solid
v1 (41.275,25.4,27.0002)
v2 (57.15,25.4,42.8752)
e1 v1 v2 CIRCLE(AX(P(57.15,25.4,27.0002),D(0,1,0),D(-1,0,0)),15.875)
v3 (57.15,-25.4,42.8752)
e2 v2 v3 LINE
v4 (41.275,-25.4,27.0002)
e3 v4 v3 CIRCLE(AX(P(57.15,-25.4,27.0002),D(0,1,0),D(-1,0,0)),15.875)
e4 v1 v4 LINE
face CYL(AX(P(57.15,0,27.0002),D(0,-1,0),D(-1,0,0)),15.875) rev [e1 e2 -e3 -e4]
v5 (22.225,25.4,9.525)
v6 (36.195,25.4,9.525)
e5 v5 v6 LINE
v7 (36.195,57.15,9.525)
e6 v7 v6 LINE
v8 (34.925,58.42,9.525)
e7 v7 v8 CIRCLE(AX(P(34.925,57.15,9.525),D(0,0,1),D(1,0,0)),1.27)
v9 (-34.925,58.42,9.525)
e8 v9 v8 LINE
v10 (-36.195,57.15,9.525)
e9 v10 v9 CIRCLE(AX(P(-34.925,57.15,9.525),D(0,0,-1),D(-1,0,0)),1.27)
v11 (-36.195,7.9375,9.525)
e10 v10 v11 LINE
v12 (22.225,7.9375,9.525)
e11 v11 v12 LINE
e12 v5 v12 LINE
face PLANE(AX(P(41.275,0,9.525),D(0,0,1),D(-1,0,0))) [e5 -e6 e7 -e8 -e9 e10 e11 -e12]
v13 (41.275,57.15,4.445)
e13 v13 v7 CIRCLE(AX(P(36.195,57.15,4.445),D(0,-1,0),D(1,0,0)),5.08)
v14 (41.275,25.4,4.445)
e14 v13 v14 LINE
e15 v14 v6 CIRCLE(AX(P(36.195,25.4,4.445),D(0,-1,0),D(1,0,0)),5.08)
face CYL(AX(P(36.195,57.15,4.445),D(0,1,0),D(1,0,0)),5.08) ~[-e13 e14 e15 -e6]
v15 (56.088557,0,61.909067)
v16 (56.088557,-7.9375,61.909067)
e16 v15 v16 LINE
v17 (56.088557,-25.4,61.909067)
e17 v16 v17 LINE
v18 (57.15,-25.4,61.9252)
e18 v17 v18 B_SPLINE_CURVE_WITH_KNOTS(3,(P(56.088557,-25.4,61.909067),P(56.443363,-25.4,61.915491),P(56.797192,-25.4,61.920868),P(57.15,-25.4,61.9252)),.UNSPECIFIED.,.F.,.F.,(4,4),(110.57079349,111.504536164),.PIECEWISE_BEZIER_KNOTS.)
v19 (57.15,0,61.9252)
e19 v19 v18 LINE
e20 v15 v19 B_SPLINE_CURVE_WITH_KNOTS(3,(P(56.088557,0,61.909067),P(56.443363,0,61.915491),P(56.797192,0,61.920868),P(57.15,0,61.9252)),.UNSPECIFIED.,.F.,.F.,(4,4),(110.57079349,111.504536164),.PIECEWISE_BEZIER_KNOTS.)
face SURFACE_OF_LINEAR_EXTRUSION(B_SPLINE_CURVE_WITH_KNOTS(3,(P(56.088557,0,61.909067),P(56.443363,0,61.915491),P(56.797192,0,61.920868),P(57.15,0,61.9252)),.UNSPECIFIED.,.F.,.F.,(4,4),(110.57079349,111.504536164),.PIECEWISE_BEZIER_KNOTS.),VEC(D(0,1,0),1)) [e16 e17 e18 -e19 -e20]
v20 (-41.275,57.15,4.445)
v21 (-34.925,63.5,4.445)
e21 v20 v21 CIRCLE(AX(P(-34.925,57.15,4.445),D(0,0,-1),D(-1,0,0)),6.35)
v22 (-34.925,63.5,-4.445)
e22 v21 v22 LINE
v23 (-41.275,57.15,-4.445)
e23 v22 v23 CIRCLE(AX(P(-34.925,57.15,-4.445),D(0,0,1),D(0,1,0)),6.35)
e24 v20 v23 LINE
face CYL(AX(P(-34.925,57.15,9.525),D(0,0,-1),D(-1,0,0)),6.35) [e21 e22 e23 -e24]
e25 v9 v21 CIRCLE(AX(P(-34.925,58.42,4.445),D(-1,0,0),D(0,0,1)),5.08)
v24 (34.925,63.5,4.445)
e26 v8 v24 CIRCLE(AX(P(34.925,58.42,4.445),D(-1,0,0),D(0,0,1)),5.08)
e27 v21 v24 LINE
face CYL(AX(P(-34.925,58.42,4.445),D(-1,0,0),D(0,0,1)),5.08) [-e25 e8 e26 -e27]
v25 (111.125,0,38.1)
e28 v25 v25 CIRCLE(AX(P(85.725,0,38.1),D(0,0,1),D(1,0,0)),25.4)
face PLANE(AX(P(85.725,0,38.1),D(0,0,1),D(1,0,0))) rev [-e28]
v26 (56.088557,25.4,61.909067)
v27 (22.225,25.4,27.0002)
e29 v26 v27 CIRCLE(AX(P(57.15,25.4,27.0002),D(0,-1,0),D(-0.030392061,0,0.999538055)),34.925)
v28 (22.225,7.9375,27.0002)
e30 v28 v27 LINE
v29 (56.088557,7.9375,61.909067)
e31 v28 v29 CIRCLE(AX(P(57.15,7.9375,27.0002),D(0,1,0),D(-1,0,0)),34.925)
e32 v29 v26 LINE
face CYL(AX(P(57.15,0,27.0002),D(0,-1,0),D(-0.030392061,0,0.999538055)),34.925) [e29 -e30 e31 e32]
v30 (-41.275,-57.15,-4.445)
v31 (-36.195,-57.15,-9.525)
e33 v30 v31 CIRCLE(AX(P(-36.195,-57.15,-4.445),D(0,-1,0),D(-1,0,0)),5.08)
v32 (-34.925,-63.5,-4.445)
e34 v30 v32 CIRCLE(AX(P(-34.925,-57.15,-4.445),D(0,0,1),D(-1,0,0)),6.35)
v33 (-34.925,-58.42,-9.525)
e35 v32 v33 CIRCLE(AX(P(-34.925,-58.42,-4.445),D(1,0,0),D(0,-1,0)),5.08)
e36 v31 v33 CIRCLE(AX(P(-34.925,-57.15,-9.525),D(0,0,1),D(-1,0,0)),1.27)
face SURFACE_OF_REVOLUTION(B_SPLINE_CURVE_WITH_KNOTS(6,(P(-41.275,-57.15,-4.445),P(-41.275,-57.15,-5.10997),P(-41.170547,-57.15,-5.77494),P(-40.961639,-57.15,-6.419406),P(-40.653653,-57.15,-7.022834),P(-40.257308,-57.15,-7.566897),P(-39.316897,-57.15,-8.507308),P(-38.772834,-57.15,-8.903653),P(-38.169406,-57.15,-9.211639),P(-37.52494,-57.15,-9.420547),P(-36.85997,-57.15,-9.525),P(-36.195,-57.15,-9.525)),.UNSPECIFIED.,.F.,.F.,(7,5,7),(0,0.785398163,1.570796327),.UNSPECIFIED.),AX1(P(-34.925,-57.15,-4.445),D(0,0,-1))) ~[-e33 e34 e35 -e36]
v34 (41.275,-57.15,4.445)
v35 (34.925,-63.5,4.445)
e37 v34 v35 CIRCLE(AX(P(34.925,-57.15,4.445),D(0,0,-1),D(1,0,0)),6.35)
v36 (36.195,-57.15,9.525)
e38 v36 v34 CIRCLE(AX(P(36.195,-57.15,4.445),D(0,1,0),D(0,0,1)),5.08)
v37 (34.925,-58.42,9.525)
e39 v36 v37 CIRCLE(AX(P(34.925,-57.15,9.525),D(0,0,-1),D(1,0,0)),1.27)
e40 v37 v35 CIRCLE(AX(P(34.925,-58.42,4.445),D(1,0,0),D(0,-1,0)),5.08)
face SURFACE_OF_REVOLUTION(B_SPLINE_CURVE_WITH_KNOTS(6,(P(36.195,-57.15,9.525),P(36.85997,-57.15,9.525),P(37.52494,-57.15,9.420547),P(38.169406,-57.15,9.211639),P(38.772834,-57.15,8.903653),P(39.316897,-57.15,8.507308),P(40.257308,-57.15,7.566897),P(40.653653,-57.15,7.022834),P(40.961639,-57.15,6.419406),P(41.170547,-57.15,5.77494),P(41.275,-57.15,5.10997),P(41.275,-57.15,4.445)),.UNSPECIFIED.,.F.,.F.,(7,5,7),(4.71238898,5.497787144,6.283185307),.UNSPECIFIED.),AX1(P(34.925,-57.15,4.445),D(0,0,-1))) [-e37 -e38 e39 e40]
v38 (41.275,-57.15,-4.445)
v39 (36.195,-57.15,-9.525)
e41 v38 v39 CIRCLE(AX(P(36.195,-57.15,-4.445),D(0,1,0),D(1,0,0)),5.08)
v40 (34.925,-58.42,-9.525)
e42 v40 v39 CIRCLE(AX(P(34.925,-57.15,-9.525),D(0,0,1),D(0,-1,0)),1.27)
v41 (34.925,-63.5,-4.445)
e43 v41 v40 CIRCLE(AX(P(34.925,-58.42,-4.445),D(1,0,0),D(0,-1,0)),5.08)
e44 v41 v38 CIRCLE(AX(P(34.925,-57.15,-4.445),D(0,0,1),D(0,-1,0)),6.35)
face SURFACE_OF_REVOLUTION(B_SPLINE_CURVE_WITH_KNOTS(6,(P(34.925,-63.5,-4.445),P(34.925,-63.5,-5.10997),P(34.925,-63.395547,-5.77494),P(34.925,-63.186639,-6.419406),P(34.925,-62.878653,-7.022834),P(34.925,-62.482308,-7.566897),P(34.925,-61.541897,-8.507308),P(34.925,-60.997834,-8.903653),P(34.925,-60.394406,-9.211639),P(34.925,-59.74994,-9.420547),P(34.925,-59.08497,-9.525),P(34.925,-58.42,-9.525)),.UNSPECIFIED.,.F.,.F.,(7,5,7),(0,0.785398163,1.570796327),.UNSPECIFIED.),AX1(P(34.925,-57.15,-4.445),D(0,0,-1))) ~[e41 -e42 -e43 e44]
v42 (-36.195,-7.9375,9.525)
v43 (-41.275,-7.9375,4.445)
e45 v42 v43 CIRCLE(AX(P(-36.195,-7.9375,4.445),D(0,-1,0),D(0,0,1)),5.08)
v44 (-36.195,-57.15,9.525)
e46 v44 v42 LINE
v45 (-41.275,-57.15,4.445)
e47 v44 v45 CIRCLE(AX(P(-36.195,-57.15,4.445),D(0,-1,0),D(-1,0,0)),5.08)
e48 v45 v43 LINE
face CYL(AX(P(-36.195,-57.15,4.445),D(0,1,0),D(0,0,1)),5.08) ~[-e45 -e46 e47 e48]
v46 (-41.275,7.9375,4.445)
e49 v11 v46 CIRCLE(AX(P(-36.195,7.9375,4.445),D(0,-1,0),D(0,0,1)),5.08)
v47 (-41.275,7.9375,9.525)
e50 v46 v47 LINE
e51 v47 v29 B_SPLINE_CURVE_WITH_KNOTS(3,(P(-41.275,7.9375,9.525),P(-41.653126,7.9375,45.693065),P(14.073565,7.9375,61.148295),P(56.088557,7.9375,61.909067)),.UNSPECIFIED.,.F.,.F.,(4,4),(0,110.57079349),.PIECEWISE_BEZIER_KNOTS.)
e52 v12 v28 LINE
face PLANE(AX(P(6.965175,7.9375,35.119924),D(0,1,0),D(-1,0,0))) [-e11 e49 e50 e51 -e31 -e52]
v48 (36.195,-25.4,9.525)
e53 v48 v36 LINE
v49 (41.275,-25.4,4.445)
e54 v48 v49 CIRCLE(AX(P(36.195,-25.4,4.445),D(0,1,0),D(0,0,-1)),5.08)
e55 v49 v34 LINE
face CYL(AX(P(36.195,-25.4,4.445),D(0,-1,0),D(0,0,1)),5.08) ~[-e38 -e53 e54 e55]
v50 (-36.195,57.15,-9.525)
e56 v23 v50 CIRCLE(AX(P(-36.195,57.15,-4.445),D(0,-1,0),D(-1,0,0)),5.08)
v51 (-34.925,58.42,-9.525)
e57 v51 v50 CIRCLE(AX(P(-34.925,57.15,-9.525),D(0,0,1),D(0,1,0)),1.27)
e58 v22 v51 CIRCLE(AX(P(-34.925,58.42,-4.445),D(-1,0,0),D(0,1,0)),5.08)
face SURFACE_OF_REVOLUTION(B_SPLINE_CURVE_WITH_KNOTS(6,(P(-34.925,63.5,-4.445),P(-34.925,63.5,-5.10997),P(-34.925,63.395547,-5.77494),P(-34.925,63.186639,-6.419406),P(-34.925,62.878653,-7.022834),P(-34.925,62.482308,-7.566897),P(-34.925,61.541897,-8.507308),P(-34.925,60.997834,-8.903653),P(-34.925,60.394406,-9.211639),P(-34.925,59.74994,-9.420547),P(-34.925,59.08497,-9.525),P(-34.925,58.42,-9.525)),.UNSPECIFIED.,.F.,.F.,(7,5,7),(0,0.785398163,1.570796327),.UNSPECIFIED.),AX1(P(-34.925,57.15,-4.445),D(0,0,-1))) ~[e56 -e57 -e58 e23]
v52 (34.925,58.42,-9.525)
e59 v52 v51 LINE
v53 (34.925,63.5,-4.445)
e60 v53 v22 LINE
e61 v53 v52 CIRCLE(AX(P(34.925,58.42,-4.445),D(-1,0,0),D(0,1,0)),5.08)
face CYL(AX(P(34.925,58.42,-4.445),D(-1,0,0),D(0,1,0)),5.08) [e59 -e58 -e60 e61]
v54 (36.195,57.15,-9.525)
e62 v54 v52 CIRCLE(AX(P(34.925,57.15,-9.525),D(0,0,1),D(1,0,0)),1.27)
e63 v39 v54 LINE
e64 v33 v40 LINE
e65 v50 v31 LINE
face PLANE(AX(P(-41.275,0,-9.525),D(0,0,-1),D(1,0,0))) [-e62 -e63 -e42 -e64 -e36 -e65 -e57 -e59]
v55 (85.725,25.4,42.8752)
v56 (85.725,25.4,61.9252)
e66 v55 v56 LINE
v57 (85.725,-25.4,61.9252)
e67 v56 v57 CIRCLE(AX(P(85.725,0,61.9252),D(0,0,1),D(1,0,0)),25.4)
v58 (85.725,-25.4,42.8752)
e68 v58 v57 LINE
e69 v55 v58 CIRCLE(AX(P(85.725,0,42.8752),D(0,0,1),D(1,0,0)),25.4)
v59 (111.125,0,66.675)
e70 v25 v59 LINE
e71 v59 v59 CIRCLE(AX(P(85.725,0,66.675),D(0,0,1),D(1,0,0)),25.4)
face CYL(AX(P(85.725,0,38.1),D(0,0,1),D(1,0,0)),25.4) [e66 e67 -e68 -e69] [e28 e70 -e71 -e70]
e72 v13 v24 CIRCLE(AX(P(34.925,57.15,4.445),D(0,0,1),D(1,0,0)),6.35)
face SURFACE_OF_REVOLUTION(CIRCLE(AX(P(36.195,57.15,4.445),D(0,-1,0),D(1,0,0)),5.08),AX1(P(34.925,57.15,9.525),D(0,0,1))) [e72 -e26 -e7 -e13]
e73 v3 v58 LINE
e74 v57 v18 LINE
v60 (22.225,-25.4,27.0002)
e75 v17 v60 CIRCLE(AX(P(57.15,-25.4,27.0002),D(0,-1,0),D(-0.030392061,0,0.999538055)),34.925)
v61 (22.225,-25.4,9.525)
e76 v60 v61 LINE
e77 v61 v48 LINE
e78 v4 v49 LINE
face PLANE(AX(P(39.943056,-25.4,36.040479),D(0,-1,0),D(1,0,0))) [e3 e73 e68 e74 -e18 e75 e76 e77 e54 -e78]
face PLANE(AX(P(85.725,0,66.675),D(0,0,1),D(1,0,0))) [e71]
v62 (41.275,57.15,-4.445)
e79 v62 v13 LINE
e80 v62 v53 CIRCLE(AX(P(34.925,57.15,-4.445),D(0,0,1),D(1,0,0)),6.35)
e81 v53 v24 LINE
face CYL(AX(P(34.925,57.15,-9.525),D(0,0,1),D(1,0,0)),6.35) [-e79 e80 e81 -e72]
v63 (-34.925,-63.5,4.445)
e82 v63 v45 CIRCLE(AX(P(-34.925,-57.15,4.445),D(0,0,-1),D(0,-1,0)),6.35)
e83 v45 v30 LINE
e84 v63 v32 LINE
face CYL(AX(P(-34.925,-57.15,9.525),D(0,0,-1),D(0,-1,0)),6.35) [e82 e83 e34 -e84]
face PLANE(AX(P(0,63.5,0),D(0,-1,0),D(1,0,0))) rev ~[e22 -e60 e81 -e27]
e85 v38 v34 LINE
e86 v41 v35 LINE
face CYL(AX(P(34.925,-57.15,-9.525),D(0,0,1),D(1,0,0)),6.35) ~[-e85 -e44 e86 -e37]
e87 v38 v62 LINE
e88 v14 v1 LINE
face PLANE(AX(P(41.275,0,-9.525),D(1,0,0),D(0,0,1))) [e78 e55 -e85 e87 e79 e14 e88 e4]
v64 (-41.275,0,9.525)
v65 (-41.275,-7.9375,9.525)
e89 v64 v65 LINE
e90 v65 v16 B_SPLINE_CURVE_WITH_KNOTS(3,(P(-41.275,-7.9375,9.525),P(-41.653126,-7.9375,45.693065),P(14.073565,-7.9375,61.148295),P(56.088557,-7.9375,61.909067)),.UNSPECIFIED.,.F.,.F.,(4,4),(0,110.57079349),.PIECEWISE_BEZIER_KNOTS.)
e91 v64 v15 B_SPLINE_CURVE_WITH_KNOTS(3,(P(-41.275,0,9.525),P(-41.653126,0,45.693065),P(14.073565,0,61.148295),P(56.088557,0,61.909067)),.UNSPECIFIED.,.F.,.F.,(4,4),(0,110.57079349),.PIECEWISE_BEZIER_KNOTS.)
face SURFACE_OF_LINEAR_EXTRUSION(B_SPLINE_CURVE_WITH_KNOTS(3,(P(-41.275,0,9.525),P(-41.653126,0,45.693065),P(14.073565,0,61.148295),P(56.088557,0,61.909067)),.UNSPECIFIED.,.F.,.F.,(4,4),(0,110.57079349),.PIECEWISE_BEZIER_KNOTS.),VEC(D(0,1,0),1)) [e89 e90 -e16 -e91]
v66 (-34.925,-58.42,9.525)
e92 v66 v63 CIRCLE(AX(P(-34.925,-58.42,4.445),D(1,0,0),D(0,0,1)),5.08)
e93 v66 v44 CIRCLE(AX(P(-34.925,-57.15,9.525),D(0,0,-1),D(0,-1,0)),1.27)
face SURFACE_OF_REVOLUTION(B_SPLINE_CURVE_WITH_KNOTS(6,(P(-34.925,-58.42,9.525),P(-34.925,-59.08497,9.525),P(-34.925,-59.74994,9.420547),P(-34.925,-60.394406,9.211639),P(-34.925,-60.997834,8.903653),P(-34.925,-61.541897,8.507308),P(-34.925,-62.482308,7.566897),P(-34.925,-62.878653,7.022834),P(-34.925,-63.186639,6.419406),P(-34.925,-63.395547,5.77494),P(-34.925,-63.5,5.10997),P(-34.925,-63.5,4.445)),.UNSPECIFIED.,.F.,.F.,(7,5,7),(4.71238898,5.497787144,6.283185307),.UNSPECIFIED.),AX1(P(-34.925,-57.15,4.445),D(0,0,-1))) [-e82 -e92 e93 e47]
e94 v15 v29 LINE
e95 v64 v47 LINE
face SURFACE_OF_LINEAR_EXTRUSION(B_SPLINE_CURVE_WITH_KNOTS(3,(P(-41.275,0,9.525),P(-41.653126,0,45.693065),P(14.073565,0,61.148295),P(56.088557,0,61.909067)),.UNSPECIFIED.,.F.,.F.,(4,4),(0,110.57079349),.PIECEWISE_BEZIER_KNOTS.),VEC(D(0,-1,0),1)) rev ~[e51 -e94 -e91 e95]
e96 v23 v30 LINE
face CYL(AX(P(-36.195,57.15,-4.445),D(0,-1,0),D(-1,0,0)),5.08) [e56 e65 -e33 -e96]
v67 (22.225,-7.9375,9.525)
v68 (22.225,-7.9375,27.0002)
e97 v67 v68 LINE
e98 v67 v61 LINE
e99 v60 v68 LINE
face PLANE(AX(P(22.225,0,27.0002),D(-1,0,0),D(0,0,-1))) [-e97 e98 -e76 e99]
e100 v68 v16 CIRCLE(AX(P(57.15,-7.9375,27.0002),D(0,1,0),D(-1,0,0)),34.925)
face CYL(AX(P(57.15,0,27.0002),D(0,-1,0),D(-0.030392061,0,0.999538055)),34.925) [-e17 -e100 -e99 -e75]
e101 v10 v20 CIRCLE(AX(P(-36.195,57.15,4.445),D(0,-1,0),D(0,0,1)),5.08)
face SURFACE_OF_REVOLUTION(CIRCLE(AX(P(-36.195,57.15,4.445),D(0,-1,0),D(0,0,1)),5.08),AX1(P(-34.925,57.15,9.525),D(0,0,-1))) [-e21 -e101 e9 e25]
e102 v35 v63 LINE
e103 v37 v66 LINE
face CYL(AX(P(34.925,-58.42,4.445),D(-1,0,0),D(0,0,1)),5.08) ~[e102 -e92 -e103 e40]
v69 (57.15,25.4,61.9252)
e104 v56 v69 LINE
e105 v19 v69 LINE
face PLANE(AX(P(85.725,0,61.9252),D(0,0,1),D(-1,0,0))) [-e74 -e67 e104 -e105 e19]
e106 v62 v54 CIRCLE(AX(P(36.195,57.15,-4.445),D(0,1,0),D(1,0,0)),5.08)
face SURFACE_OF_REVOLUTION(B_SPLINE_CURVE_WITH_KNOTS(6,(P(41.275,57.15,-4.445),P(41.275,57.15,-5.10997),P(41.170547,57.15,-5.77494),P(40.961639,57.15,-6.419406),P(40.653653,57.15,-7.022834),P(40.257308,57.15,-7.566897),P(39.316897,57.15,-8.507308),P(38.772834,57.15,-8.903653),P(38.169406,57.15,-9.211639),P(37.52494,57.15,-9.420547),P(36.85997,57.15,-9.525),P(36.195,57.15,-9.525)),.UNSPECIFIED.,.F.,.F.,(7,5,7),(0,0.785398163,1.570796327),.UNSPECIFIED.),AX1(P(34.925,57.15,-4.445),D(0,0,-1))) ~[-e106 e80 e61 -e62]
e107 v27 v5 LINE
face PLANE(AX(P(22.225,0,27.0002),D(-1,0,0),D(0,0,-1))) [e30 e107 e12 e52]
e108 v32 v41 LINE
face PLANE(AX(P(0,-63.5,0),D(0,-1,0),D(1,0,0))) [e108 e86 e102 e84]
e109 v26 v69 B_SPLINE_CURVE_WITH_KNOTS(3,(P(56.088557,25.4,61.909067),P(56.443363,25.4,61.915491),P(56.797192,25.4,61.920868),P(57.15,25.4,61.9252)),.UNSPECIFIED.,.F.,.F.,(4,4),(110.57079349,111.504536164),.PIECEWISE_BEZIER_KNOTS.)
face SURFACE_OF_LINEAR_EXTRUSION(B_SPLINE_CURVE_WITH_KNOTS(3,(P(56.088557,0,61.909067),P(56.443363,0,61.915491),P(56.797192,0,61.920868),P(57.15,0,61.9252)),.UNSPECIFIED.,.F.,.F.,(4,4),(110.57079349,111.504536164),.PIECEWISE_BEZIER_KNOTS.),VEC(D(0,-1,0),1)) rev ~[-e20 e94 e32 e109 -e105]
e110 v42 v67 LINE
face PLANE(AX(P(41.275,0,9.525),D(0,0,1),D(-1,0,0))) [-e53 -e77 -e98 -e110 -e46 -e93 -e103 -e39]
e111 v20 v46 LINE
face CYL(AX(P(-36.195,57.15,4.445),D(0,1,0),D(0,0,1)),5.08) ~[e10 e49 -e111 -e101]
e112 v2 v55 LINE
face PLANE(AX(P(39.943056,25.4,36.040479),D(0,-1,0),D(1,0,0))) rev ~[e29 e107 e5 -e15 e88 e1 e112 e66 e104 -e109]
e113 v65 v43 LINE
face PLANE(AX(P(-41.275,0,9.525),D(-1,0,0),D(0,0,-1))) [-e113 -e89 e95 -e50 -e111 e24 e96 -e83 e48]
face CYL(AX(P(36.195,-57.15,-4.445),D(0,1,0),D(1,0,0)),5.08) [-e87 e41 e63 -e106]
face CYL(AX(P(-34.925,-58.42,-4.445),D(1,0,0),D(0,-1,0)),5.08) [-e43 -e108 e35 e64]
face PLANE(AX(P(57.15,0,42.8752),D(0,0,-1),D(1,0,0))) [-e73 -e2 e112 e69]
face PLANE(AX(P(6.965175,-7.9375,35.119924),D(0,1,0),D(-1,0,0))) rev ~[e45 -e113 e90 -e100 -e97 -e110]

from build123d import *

# Parameters (mm, degrees)
F1_DEPTH     = 63.5
F0_W         = 25.4
F0_H         = 19.05
F2_DEPTH     = 25.4
F3_DEPTH     = 7.9375
F5_R         = 6.35
F6_R         = 5.08
F7_T1_DEPTH  = 69.85
F7_T3_DEPTH  = 49.2125
F7_T5_DEPTH  = 31.75
F7_T8_ANGLE  = 90
F7_T10_ANGLE = 90
F8_R         = 5.08


# Not quite as in the source:
# - a fillet or chamfer that OpenCascade refuses, or shapes differently, is made with other operations: its cross-section is extruded or revolved along the edge and cut away or added


with BuildPart() as f1:
    # F0 (on Front) → F1 (new body, symmetric)
    with BuildSketch(Plane.XZ):
        Polygon((22.225, 9.525), (-41.275, 9.525), (-41.275, -9.525), (41.275, -9.525), (41.275, 9.525), align=None)
    extrude(amount=F1_DEPTH, both=True)

    # F0 (on Front) → F2 (join, symmetric)
    with BuildSketch(Plane.XZ):
        with BuildLine():
            Line((22.225, 27.0002), (22.225, 9.525))
            Line((22.225, 9.525), (41.275, 9.525))
            Line((41.275, 9.525), (41.275, 27.0002))
            ThreePointArc((41.275, 27.0002), (45.9246798487, 38.2255201513), (57.15, 42.8752))
            Line((57.15, 42.8752), (60.325, 42.8752))
            Line((60.325, 42.8752), (60.325, 61.9252))
            Line((60.325, 61.9252), (57.15, 61.9252))
            add(Edge.make_bspline(
                [(56.0885572702, 61.9090665575), (56.4433633619, 61.9154910812), (56.7971916203, 61.9208676872), (57.15, 61.9252)],
                knots=[110.5707934898, 110.5707934898, 110.5707934898, 110.5707934898, 111.5045361635, 111.5045361635, 111.5045361635, 111.5045361635], degree=3))
            ThreePointArc((56.0885572702, 61.9090665575), (32.0818278255, 51.3177321287), (22.225, 27.0002))
        make_face()
        with Locations((73.025, 52.4002)):
            Rectangle(F0_W, F0_H)
    extrude(amount=F2_DEPTH, both=True)

    # F0 (on Front) → F3 (join, symmetric)
    with BuildSketch(Plane.XZ):
        with BuildLine():
            add(Edge.make_bspline(
                [(-41.275, 9.525), (-41.6531258736, 45.6930648181), (14.073565129, 61.1482951996), (56.0885572702, 61.9090665575)],
                knots=[0, 0, 0, 0, 110.5707934898, 110.5707934898, 110.5707934898, 110.5707934898], degree=3))
            Line((-41.275, 9.525), (22.225, 9.525))
            Line((22.225, 9.525), (22.225, 27.0002))
            ThreePointArc((22.225, 27.0002), (32.0818278255, 51.3177321287), (56.0885572702, 61.9090665575))
        make_face()
    extrude(amount=F3_DEPTH, both=True)

    # F0 (on Front) → F4 (revolve)
    with BuildSketch(Plane.XZ):
        Polygon((85.725, 66.675), (85.725, 61.9252), (85.725, 42.8752), (85.725, 38.1), (111.125, 38.1), (111.125, 66.675), align=None)
    revolve(axis=Axis((85.725, 0, 52.3875), (0, 0, 1)))

    # F5
    f5_edges = [f1.edges().sort_by_distance(p)[0] for p in [
        (-41.275, -63.5, 0),
        (41.275, -63.5, 0),
        (41.275, 63.5, 0),
        (-41.275, 63.5, 0),
    ]]
    fillet(f5_edges, radius=F5_R)

    # F6
    f6_edges = [f1.edges().sort_by_distance(p)[0] for p in [
        (0, -63.5, -9.525),
    ]]
    fillet(f6_edges, radius=F6_R)

    # F7: fillet of radius 5.08 on 1 edges, made by hand

    # F7_s2 → F7_t1 (cut)
    with BuildSketch(Plane.YZ.offset(-34.925)):
        with BuildLine():
            ThreePointArc((58.42, 9.525), (62.0121024484, 8.0371024484), (63.5, 4.445))
            Line((63.5, 4.445), (63.5, 9.525))
            Line((63.5, 9.525), (58.42, 9.525))
        make_face()
    extrude(amount=F7_T1_DEPTH, mode=Mode.SUBTRACT)

    # F7_s4 → F7_t3 (cut)
    with BuildSketch(Plane.XZ.offset(-57.15)):
        with BuildLine():
            ThreePointArc((-36.195, 9.525), (-39.7871024484, 8.0371024484), (-41.275, 4.445))
            Line((-41.275, 4.445), (-41.275, 9.525))
            Line((-41.275, 9.525), (-36.195, 9.525))
        make_face()
    extrude(amount=F7_T3_DEPTH, mode=Mode.SUBTRACT)

    # F7_s6 → F7_t5 (cut)
    with BuildSketch(Plane.XZ.offset(-57.15)):
        with BuildLine():
            ThreePointArc((41.275, 4.445), (39.7871024484, 8.0371024484), (36.195, 9.525))
            Line((36.195, 9.525), (41.275, 9.525))
            Line((41.275, 9.525), (41.275, 4.445))
        make_face()
    extrude(amount=F7_T5_DEPTH, mode=Mode.SUBTRACT)

    # F7_s7 → F7_t8 (revolve, cut)
    with BuildSketch(Plane.XZ.offset(-57.15)):
        with BuildLine():
            ThreePointArc((41.275, 4.445), (39.7871024484, 8.0371024484), (36.195, 9.525))
            Line((36.195, 9.525), (41.275, 9.525))
            Line((41.275, 9.525), (41.275, 4.445))
        make_face()
    revolve(axis=Axis((34.925, 57.15, 9.525), (0, 0, 1)), revolution_arc=F7_T8_ANGLE, mode=Mode.SUBTRACT)

    # F7_s9 → F7_t10 (revolve, cut)
    with BuildSketch(Plane.XZ.offset(-57.15)):
        with BuildLine():
            ThreePointArc((-36.195, 9.525), (-39.7871024484, 8.0371024484), (-41.275, 4.445))
            Line((-41.275, 4.445), (-41.275, 9.525))
            Line((-41.275, 9.525), (-36.195, 9.525))
        make_face()
    revolve(axis=Axis((-34.925, 57.15, 9.525), (0, 0, -1)), revolution_arc=F7_T10_ANGLE, mode=Mode.SUBTRACT)

    # F8
    f8_edges = [f1.edges().sort_by_distance(p)[0] for p in [
        (0, -63.5, 9.525),
        (41.275, -41.275, 9.525),
        (39.415128, -61.640128, 9.525),
        (-39.415128, -61.640128, 9.525),
        (-41.275, -32.54375, 9.525),
    ]]
    fillet(f8_edges, radius=F8_R)


solid = f1.part
